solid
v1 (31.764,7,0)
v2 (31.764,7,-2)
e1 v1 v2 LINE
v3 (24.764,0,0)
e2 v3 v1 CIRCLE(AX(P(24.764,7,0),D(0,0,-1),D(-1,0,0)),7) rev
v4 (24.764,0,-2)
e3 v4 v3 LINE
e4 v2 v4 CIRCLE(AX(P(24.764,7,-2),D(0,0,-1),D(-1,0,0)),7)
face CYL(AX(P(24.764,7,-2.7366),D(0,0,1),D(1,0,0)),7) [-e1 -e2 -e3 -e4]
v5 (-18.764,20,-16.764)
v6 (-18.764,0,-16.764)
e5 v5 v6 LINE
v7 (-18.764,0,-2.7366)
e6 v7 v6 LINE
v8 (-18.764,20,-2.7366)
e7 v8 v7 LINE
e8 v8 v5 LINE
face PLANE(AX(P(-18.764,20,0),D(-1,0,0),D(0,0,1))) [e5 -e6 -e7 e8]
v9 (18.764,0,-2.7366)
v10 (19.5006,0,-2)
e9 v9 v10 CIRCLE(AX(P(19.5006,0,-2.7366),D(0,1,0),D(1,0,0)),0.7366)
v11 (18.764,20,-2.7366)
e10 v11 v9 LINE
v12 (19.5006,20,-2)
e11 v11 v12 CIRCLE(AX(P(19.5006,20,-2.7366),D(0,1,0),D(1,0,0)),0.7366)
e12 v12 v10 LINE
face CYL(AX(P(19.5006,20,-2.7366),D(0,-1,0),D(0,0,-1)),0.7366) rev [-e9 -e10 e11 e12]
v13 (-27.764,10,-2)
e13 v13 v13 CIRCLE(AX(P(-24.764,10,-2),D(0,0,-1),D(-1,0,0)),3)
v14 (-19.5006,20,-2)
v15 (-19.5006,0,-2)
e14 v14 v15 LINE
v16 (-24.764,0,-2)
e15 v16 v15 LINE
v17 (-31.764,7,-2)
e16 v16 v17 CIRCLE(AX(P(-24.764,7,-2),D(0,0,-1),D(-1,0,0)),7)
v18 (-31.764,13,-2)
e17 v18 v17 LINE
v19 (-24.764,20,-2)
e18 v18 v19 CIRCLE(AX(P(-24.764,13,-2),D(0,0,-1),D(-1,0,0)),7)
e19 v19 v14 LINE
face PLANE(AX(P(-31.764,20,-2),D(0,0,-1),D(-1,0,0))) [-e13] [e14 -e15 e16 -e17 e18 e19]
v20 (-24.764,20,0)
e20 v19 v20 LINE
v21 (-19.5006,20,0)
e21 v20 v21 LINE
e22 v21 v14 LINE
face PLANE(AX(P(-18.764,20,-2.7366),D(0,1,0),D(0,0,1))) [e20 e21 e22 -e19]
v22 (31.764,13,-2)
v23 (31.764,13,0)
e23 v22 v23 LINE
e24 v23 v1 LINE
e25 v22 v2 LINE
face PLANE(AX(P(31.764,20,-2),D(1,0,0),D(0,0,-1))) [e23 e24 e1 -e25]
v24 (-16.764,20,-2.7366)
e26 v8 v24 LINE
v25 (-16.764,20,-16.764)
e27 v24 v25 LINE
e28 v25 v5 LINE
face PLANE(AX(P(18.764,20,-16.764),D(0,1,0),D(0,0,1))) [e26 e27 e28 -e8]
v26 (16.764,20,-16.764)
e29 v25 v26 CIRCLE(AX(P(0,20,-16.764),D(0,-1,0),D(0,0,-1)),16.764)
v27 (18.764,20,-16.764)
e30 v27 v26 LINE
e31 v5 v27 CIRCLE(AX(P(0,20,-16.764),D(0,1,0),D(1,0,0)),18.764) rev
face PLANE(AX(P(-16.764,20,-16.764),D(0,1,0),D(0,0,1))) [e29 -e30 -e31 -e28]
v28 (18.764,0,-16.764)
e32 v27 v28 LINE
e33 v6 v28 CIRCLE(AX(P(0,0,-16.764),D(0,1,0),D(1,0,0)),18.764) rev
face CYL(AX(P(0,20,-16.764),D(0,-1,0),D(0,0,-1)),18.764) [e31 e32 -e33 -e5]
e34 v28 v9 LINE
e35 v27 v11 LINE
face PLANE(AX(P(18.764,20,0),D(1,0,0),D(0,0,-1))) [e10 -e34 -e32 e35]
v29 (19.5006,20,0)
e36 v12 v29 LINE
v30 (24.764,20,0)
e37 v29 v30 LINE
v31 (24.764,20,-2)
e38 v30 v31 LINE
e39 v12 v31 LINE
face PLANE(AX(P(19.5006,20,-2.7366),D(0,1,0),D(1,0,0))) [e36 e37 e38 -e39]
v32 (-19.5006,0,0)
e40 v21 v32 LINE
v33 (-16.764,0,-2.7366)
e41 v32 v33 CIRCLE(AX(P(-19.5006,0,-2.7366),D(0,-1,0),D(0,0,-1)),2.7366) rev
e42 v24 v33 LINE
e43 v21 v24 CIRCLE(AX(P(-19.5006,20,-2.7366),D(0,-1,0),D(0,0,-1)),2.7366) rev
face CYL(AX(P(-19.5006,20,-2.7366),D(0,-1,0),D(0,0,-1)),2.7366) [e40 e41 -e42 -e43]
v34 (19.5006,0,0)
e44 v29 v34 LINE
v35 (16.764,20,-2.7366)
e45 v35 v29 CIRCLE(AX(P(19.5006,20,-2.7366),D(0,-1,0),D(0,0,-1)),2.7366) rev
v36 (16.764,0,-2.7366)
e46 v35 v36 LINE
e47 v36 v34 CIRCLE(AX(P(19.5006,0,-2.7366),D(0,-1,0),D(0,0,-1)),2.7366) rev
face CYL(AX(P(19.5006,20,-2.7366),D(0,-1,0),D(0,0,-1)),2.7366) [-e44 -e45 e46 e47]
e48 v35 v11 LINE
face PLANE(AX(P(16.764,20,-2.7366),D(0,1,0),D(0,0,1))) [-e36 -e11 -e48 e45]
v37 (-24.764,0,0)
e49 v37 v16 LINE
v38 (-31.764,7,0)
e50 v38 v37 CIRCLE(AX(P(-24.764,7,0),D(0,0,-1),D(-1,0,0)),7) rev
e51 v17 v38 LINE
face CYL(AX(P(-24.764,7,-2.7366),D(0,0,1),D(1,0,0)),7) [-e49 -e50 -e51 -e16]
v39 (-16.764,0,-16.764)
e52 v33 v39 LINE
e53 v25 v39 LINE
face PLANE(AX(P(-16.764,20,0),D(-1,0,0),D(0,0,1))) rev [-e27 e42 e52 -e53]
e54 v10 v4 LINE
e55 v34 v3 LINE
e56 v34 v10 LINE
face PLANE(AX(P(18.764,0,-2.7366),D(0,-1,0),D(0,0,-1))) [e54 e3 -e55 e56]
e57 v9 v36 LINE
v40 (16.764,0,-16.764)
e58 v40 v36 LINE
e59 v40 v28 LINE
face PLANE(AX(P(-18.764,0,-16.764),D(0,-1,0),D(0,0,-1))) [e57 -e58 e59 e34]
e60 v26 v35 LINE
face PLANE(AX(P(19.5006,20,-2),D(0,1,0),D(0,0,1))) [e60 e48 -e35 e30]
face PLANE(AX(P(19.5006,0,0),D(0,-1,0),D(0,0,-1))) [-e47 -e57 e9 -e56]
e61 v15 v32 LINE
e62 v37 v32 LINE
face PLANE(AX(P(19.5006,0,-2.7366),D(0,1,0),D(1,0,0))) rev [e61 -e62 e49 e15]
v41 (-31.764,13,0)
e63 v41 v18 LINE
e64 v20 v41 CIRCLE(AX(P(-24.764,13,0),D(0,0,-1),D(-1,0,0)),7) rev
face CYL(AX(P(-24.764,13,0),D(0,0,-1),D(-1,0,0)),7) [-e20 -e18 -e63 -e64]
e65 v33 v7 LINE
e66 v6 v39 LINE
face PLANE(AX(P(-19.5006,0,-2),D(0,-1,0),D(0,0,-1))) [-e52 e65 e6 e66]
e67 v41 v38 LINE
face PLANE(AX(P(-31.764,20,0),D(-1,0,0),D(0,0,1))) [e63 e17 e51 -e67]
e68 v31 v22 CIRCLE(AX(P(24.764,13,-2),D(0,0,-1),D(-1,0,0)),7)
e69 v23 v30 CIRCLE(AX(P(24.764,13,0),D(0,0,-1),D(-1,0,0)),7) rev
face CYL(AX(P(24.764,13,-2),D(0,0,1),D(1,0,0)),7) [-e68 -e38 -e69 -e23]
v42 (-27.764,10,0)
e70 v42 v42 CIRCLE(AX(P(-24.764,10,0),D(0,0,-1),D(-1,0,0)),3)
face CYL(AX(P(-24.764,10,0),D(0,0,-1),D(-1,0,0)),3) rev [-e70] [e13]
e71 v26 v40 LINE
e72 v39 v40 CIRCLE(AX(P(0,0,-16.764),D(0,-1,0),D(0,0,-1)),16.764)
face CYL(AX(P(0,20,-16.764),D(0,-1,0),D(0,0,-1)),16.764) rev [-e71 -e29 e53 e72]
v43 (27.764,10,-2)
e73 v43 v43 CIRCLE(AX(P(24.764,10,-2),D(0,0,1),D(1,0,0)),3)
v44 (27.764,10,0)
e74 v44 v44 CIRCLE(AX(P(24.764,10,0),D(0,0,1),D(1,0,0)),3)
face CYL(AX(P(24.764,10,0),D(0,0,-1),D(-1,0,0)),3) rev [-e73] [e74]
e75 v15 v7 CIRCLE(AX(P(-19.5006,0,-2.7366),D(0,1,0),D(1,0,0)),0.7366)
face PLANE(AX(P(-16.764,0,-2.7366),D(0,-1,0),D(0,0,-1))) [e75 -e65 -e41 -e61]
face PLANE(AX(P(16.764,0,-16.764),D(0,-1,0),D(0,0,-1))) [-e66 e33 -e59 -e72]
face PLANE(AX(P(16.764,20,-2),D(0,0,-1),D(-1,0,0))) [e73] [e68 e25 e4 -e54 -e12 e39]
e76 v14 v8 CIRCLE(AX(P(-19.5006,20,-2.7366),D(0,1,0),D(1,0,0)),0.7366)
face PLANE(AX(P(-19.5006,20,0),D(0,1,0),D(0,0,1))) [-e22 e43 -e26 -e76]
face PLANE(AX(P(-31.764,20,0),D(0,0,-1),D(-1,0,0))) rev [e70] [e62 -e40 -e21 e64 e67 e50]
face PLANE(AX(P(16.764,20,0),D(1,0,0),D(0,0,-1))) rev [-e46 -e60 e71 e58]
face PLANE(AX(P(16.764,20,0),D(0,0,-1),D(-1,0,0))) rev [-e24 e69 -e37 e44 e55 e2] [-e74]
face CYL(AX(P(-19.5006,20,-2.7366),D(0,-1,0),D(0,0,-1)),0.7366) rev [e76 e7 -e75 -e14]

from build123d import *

# Parameters (mm, degrees)
BASE_FLANGE2_DEPTH = 20
FILLET1_R          = 7
SKETCH17_R         = 3
CUT_EXTRUDE1_DEPTH = 51.329697794


# Sheet-metal steps are written as plain solids
with BuildPart() as part:
    # Sketch12 → Base-Flange2 (new body)
    with BuildSketch(Plane(origin=(0, 0, 0), x_dir=(1, 0, 0), z_dir=(0, 1, 0))):
        with BuildLine():
            Line((-31.764, 0), (-19.5006, 0))
            ThreePointArc((-19.5006, 0), (-17.565531583, 0.801531583), (-16.764, 2.7366))
            Line((-16.764, 2.7366), (-16.764, 16.764))
            ThreePointArc((-16.764, 16.764), (0, 33.528), (16.764, 16.764))
            Line((16.764, 16.764), (16.764, 2.7366))
            ThreePointArc((16.764, 2.7366), (17.565531583, 0.801531583), (19.5006, 0))
            Line((19.5006, 0), (31.764, 0))
            Line((31.764, 0), (31.764, 2))
            Line((31.764, 2), (19.5006, 2))
            ThreePointArc((19.5006, 2), (18.979745145, 2.215745145), (18.764, 2.7366))
            Line((18.764, 2.7366), (18.764, 16.764))
            ThreePointArc((18.764, 16.764), (0, 35.528), (-18.764, 16.764))
            Line((-18.764, 16.764), (-18.764, 2.7366))
            ThreePointArc((-18.764, 2.7366), (-18.979745145, 2.215745145), (-19.5006, 2))
            Line((-19.5006, 2), (-31.764, 2))
            Line((-31.764, 2), (-31.764, 0))
        make_face()
    extrude(amount=BASE_FLANGE2_DEPTH)

    # Fillet1
    fillet1_edges = [part.edges().sort_by_distance(p)[0] for p in [
        (-31.764, 0, -1),
        (31.764, 0, -1),
        (-31.764, 20, -1),
        (31.764, 20, -1),
    ]]
    fillet(fillet1_edges, radius=FILLET1_R)

    # Sketch17 → Cut-Extrude1 (cut, through all)
    with BuildSketch(Plane(origin=(0, 0, -2), x_dir=(-1, 0, 0), z_dir=(0, 0, -1))):
        with Locations((24.764, 10)):
            Circle(SKETCH17_R)
    cut_extrude1 = extrude(amount=-CUT_EXTRUDE1_DEPTH, mode=Mode.SUBTRACT)

    # Mirror1: Cut-Extrude1 across plane
    add(cut_extrude1.mirror(Plane(origin=(0, 0, 0), x_dir=(0, 0, 1), z_dir=(1, 0, 0))), mode=Mode.SUBTRACT)


solid = part.part
